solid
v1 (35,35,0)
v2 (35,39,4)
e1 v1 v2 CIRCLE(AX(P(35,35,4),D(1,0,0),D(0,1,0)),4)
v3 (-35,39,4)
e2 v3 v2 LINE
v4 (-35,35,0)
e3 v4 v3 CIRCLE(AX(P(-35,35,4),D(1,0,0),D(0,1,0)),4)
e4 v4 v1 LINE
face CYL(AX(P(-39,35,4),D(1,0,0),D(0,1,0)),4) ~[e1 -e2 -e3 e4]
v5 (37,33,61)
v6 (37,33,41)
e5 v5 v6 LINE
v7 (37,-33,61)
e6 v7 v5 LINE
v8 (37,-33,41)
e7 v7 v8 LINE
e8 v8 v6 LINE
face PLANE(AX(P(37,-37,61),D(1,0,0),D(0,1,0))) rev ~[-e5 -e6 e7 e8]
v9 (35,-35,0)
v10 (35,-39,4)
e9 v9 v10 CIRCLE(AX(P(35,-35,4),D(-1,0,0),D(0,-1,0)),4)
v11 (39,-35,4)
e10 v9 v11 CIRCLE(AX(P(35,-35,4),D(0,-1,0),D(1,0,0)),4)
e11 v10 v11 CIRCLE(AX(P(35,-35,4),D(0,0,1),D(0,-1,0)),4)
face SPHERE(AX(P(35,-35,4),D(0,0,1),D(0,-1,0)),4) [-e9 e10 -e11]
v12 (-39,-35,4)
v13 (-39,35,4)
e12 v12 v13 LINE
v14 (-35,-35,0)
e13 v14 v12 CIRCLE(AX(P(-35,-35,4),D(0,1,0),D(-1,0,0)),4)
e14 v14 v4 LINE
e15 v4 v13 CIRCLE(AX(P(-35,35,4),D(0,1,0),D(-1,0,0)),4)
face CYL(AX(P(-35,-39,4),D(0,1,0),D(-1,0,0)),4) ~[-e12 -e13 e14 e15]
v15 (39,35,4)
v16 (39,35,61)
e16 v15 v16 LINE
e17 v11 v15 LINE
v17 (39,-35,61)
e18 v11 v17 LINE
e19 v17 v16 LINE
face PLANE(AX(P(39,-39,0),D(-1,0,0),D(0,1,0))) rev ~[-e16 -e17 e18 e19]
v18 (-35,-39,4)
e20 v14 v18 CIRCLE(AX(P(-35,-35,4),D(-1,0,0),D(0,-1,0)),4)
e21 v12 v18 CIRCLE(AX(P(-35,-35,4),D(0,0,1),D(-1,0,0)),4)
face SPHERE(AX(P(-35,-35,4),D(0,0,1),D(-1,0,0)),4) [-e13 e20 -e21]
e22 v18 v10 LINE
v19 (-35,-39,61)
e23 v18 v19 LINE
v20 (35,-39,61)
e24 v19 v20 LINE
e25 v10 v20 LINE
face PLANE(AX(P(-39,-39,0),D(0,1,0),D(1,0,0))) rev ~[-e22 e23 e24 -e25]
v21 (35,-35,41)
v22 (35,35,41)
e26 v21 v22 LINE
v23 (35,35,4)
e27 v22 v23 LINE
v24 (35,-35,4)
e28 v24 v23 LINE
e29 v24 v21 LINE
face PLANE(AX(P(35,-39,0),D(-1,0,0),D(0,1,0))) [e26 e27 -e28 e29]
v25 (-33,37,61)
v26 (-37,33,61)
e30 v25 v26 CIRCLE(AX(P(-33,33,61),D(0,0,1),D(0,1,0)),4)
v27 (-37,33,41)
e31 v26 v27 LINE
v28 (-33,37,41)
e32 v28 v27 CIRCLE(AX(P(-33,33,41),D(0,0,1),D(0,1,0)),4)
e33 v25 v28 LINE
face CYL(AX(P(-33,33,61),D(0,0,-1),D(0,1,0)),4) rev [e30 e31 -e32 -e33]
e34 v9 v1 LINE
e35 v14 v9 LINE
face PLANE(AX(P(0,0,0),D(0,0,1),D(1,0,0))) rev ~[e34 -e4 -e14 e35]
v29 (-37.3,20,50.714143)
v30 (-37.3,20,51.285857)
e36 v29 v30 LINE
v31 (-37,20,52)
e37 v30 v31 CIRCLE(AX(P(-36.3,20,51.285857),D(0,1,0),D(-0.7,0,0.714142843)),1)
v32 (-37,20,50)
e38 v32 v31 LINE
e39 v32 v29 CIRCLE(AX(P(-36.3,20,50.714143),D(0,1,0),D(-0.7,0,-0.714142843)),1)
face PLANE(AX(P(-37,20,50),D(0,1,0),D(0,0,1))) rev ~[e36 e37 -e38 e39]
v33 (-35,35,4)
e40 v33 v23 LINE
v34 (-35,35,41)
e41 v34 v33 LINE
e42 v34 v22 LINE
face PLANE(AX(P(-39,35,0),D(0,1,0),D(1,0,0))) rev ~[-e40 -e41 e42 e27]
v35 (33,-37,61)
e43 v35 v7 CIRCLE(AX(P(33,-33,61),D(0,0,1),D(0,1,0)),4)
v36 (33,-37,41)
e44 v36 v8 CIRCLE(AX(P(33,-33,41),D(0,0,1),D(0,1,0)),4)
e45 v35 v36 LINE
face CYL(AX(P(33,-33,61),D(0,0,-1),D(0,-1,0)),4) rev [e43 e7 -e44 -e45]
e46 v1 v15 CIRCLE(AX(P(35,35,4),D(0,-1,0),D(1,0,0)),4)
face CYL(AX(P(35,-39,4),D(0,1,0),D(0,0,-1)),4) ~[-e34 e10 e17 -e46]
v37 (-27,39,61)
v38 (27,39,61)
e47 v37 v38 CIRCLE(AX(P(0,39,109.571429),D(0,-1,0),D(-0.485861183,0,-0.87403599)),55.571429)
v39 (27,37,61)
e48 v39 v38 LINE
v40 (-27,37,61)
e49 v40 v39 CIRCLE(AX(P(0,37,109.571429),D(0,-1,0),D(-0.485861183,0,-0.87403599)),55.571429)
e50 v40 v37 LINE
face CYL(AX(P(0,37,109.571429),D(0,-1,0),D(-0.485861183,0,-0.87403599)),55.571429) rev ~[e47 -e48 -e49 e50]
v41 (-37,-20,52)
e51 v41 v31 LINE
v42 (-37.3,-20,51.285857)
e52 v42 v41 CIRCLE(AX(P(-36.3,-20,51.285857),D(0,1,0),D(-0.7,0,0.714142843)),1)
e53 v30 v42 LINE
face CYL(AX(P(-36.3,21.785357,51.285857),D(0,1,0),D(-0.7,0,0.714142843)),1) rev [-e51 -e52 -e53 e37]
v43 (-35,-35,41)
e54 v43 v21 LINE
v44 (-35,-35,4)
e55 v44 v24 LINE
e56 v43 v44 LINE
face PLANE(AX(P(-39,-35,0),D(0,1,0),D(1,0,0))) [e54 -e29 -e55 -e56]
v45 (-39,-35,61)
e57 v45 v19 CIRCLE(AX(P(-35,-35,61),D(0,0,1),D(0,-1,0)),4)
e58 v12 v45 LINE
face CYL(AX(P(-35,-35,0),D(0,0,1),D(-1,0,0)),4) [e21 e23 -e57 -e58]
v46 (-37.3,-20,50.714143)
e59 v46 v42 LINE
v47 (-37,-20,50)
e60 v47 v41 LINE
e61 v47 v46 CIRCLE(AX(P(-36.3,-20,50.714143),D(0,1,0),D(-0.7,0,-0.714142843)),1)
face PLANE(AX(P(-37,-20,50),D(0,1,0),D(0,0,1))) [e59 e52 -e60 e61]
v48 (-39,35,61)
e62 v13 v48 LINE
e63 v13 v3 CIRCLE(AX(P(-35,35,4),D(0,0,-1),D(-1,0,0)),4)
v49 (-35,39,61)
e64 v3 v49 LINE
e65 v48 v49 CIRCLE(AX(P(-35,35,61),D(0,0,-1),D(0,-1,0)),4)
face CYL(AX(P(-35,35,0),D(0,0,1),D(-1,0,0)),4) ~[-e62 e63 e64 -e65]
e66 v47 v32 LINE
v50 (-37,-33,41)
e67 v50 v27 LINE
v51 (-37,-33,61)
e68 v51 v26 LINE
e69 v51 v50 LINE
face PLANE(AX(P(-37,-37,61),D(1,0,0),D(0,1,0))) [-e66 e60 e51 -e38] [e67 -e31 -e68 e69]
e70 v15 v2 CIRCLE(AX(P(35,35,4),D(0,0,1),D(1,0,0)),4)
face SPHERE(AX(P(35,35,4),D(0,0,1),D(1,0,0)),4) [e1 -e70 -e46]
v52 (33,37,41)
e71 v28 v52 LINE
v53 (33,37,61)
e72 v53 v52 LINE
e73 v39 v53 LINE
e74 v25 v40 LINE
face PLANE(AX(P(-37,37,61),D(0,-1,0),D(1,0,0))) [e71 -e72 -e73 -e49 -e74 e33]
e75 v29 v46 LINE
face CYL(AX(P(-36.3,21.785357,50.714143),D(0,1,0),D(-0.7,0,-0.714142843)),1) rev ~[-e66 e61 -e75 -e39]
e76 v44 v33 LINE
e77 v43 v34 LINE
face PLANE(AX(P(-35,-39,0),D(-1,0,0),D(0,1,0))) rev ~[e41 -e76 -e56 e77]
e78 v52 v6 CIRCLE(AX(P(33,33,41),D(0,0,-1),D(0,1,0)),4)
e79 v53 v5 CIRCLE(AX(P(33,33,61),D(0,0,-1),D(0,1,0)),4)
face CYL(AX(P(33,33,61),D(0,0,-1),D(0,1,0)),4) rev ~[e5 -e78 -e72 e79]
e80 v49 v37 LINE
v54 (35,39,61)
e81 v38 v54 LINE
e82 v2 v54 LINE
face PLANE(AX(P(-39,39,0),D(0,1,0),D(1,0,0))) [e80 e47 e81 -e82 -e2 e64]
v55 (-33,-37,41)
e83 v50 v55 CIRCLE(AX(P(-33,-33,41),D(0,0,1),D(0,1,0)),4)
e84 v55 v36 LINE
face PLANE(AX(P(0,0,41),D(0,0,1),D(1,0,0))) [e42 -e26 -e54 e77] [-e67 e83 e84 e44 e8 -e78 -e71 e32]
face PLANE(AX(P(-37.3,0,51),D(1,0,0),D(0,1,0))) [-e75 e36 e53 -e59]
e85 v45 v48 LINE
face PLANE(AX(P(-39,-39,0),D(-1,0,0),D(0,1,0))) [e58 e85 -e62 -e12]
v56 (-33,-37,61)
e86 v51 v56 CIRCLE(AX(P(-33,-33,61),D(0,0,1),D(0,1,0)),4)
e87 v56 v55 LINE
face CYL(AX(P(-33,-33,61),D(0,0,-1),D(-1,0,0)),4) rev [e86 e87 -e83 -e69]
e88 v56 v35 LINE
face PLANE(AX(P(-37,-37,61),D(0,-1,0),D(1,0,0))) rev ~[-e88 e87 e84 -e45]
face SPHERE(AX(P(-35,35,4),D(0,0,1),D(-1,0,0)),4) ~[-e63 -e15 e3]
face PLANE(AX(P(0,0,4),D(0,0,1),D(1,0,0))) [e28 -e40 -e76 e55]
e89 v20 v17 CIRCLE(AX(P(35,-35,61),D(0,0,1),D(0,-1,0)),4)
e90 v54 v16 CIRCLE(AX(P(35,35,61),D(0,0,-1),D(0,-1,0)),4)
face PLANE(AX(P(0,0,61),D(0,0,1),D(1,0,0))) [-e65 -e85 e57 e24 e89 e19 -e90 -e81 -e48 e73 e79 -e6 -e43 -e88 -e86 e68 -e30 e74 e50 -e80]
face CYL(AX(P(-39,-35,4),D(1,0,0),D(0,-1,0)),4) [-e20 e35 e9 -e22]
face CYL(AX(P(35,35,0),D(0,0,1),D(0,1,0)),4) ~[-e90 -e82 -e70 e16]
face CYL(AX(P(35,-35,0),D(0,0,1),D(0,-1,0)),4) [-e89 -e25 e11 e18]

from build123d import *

# Parameters (mm, degrees)
F0_W         = 78
F0_H         = 78
F1_DEPTH     = 61
F2_T         = -4
F3_W         = 74
F3_H         = 74
F3_W_2       = 70
F3_H_2       = 70
F4_DEPTH     = 20
F6_DEPTH     = 2
F7_R         = 4
F8_R         = 4
F9_W         = 40
F9_H         = 2
F10_DEPTH    = 0.3
F11_T1_DEPTH = 43.5707142143


# Not quite as in the source:
# - a fillet or chamfer that OpenCascade refuses, or shapes differently, is made with other operations: its cross-section is extruded or revolved along the edge and cut away or added


with BuildPart() as f1:
    # F0 (on Top) → F1 (new body)
    with BuildSketch(Plane.XY):
        Rectangle(F0_W, F0_H)
    extrude(amount=F1_DEPTH)

    # F2
    f2_openings = [f1.faces().sort_by_distance(p)[0] for p in [
        (0, 0, 61),
    ]]
    offset(amount=F2_T, openings=f2_openings)

    # F3 (on face) → F4 (cut)
    with BuildSketch(Plane.XY.offset(61)):
        Rectangle(F3_W, F3_H)
        Rectangle(F3_W_2, F3_H_2, mode=Mode.SUBTRACT)
    extrude(amount=-F4_DEPTH, mode=Mode.SUBTRACT)

    # F5 (on face) → F6 (cut)
    with BuildSketch(Plane.XZ.offset(-37)):
        with BuildLine():
            Line((27, 61), (-27, 61))
            ThreePointArc((-27, 61), (0, 54), (27, 61))
        make_face()
    extrude(amount=-F6_DEPTH, mode=Mode.SUBTRACT)

    # F7
    f7_edges = [f1.edges().sort_by_distance(p)[0] for p in [
        (-39, 39, 30.5),
        (39, 39, 30.5),
        (39, -39, 30.5),
        (-39, -39, 30.5),
        (-39, 0, 0),
        (0, -39, 0),
        (39, 0, 0),
        (0, 39, 0),
    ]]
    fillet(f7_edges, radius=F7_R)

    # F8
    f8_edges = [f1.edges().sort_by_distance(p)[0] for p in [
        (37, -37, 51),
        (-37, -37, 51),
        (37, 37, 51),
        (-37, 37, 51),
    ]]
    fillet(f8_edges, radius=F8_R)

    # F9 (on face) → F10 (cut)
    with BuildSketch(Plane.YZ.offset(-37)):
        with Locations((0, 51)):
            Rectangle(F9_W, F9_H)
    extrude(amount=-F10_DEPTH, mode=Mode.SUBTRACT)

    # F11: fillet of radius 1 on 2 edges, made by hand

    # F11_s2 → F11_t1 (join)
    with BuildSketch(Plane.XZ.offset(-21.7853571071)):
        with BuildLine():
            ThreePointArc((-37, 50), (-37.2219544457, 50.3268445082), (-37.3, 50.7141428429))
            Line((-37.3, 50.7141428429), (-37.3, 50))
            Line((-37.3, 50), (-37, 50))
        make_face()
        with BuildLine():
            ThreePointArc((-37, 52), (-37.2219544457, 51.6731554918), (-37.3, 51.2858571571))
            Line((-37.3, 51.2858571571), (-37.3, 52))
            Line((-37.3, 52), (-37, 52))
        make_face()
    extrude(amount=F11_T1_DEPTH)


solid = f1.part
